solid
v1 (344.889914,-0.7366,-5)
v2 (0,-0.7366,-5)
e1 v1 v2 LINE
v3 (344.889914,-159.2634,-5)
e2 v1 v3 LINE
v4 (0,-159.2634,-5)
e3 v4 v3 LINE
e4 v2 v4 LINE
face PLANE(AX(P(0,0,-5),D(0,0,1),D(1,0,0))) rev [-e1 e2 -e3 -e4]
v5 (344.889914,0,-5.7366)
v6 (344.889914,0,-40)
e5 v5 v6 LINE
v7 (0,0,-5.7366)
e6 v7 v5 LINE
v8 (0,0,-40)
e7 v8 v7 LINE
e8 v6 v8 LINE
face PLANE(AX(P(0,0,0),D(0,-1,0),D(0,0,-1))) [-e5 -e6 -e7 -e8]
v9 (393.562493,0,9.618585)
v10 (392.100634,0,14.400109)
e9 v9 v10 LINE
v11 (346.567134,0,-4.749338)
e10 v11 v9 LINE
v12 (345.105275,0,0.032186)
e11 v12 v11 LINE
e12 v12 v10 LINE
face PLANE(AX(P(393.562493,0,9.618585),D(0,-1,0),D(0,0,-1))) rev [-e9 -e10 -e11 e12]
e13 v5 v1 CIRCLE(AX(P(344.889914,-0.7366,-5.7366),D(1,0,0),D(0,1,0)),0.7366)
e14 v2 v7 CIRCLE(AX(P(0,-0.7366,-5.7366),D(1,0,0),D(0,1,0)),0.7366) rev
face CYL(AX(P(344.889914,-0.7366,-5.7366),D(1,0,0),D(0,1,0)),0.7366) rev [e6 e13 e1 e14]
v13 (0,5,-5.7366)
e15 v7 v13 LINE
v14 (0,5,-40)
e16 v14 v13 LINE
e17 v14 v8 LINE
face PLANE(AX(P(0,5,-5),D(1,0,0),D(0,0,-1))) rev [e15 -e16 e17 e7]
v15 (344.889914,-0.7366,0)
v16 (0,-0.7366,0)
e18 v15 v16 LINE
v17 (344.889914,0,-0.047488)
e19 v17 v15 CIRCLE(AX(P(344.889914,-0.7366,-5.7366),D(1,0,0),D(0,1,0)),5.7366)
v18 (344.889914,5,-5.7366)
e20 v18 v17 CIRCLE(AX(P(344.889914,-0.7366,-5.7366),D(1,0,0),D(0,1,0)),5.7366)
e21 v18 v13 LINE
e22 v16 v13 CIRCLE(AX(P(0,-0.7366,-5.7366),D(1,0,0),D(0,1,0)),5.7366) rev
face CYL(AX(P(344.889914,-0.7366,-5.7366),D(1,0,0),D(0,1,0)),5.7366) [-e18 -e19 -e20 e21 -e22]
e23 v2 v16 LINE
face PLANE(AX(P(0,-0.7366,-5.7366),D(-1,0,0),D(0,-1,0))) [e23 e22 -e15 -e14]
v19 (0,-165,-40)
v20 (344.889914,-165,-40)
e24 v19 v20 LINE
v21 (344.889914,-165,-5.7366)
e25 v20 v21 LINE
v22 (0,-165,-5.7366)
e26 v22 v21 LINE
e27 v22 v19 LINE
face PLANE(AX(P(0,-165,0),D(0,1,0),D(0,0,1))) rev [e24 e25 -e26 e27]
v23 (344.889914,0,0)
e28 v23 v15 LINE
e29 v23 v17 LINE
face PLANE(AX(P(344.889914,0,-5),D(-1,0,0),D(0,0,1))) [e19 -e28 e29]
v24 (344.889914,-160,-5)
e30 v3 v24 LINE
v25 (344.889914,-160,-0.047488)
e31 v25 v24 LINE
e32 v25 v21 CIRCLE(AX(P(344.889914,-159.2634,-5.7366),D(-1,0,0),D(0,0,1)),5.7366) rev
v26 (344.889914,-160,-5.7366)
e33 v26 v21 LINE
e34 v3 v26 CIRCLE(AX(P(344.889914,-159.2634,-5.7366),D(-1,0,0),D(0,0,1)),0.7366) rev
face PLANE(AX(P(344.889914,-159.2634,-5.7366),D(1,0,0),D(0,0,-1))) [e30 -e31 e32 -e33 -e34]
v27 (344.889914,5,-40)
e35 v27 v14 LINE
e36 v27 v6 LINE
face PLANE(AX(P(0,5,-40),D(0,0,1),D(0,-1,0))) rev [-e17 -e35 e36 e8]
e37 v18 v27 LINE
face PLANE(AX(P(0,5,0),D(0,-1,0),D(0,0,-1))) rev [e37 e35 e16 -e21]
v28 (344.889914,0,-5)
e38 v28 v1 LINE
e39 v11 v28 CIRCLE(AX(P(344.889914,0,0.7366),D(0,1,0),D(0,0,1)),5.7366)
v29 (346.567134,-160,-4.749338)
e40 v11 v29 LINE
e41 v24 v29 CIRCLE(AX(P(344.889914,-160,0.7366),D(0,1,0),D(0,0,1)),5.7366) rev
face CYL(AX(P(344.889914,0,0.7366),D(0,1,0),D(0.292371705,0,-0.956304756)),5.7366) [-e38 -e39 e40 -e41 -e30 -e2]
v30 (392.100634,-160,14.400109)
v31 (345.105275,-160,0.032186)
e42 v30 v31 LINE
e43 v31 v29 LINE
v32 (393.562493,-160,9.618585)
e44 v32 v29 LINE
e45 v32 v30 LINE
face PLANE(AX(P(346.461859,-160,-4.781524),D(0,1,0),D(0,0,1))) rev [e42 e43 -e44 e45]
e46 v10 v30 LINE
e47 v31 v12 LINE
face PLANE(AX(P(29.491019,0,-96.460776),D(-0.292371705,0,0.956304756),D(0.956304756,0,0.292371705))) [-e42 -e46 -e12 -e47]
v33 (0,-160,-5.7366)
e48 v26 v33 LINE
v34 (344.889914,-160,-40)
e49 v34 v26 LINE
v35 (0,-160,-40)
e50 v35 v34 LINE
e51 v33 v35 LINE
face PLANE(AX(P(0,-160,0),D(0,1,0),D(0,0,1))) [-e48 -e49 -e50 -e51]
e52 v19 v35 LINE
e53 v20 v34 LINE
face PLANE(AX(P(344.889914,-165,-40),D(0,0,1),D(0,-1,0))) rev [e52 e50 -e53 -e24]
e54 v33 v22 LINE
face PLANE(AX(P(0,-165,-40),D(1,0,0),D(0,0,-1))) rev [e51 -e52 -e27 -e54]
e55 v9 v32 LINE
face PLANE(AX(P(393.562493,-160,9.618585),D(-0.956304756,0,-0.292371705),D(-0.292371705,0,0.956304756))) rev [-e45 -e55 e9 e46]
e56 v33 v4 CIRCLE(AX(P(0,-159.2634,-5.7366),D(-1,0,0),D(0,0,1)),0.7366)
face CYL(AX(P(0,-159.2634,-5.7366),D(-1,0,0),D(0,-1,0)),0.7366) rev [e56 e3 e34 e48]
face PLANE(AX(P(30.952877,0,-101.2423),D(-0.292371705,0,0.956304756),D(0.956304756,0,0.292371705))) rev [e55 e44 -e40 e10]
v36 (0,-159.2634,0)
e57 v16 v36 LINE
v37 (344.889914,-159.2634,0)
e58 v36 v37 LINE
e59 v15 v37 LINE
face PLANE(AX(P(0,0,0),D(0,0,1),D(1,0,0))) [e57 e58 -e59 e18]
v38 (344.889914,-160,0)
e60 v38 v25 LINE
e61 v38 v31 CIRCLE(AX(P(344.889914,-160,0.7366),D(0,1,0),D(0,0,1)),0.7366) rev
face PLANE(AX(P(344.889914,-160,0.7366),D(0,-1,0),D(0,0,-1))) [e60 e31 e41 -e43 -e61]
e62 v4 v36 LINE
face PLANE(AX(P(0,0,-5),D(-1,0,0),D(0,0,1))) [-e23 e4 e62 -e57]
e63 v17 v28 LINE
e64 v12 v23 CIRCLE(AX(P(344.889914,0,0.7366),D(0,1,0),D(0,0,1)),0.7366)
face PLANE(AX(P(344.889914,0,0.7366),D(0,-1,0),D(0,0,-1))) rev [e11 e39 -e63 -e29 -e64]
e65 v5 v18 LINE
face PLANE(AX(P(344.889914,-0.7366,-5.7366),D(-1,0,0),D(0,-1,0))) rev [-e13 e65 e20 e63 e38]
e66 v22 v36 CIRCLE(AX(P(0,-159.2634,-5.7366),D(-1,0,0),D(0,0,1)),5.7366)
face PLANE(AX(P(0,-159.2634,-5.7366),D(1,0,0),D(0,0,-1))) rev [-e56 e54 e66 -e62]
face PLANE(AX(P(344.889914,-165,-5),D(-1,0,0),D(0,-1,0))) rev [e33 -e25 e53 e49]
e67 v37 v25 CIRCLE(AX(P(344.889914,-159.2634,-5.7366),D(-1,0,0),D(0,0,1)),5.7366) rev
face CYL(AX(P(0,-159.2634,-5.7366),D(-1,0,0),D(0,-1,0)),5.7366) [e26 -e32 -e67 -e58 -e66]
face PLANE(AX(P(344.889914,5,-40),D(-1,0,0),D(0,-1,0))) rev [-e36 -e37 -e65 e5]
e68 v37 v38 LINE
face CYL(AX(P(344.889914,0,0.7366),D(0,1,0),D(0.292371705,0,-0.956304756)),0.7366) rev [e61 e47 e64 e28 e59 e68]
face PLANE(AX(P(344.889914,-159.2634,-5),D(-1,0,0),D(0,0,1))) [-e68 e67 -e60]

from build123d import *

# Parameters (mm, degrees)
SKETCH1_W                      = 345
SKETCH1_H                      = 160
BASE_FLANGE1_DEPTH             = 5
EDGE_FLANGE1_STRIP_CUT_DEPTH   = 160
EDGE_FLANGE1_DEPTH             = 160
EDGE_FLANGE2_STRIP_W           = 21.4732
EDGE_FLANGE2_STRIP_H           = 5
EDGE_FLANGE2_STRIP_CUT_DEPTH   = 344.889914392
EDGE_FLANGE2_STRIP_2_W         = 21.4732
EDGE_FLANGE2_STRIP_2_H         = 5
EDGE_FLANGE2_STRIP_CUT_2_DEPTH = 344.889914392
EDGE_FLANGE2_DEPTH             = 344.889914392
EDGE_FLANGE2_BEND_DEPTH        = 344.889914392


# Sheet-metal steps are written as plain solids
with BuildPart() as part:
    # Sketch1 → Base-Flange1 (new body)
    with BuildSketch(Plane.XY):
        with Locations((172.5, -80)):
            Rectangle(SKETCH1_W, SKETCH1_H)
    extrude(amount=-BASE_FLANGE1_DEPTH)

    # Edge-Flange1 strip (across the edge) → Edge-Flange1 strip cut (cut)
    with BuildSketch(Plane(origin=(345, -160, 0), x_dir=(-0.29237170472273066, 0, 0.9563047559630373), z_dir=(0, 1, 0))):
        Polygon((-11.027493953, 18.967789372), (-4.749337863, -1.567133914), (0.032185917, -0.10527539), (-6.245970173, 20.429647896), align=None)
    extrude(amount=EDGE_FLANGE1_STRIP_CUT_DEPTH, mode=Mode.SUBTRACT)

    # Edge-Flange1 section (across the edge) → Edge-Flange1 (add)
    with BuildSketch(Plane(origin=(345, -160, 0), x_dir=(-0.29237170472273066, 0, 0.9563047559630373), z_dir=(0, 1, 0))):
        with BuildLine():
            Line((-5, 0.110085608), (-5, 49.252744993))
            Line((-5, 49.252744993), (0, 49.252744993))
            Line((0, 49.252744993), (0, 0.110085608))
            ThreePointArc((0, 0.110085608), (0.008090915, 0.001209195), (0.032185917, -0.10527539))
            Line((0.032185917, -0.10527539), (-4.749337863, -1.567133914))
            ThreePointArc((-4.749337863, -1.567133914), (-4.936988402, -0.73783786), (-5, 0.110085608))
        make_face()
    extrude(amount=EDGE_FLANGE1_DEPTH)

    # Edge-Flange2 strip (across the edge) → Edge-Flange2 strip cut (cut)
    with BuildSketch(Plane(origin=(344.889914392, -160, -5), x_dir=(0, 1, 0), z_dir=(-1, 0, 0))):
        with Locations((-10, -2.5)):
            Rectangle(EDGE_FLANGE2_STRIP_W, EDGE_FLANGE2_STRIP_H)
    extrude(amount=EDGE_FLANGE2_STRIP_CUT_DEPTH, mode=Mode.SUBTRACT)

    # Edge-Flange2 strip 2 (across the edge) → Edge-Flange2 strip cut 2 (cut)
    with BuildSketch(Plane(origin=(0, 0, -5), x_dir=(0, -1, 0), z_dir=(1, 0, 0))):
        with Locations((-10, -2.5)):
            Rectangle(EDGE_FLANGE2_STRIP_2_W, EDGE_FLANGE2_STRIP_2_H)
    extrude(amount=EDGE_FLANGE2_STRIP_CUT_2_DEPTH, mode=Mode.SUBTRACT)

    # Edge-Flange2 section (across the edge) → Edge-Flange2 (add)
    with BuildSketch(Plane(origin=(344.889914392, -160, -5), x_dir=(0, 1, 0), z_dir=(-1, 0, 0))):
        with BuildLine():
            Line((-5, 0.7366), (-5, 35))
            Line((-5, 35), (0, 35))
            Line((0, 35), (0, 0.7366))
            ThreePointArc((0, 0.7366), (0.215745145, 0.215745145), (0.7366, 0))
            Line((0.7366, 0), (0.7366, -5))
            ThreePointArc((0.7366, -5), (-3.319788761, -3.319788761), (-5, 0.7366))
        make_face()
    extrude(amount=EDGE_FLANGE2_DEPTH)

    # Edge-Flange2 section 2 (across the edge) → Edge-Flange2 bend (add)
    with BuildSketch(Plane(origin=(0, 0, -5), x_dir=(0, -1, 0), z_dir=(1, 0, 0))):
        with BuildLine():
            Line((-5, 0.7366), (-5, 35))
            Line((-5, 35), (0, 35))
            Line((0, 35), (0, 0.7366))
            ThreePointArc((0, 0.7366), (0.215745145, 0.215745145), (0.7366, 0))
            Line((0.7366, 0), (0.7366, -5))
            ThreePointArc((0.7366, -5), (-3.319788761, -3.319788761), (-5, 0.7366))
        make_face()
    extrude(amount=EDGE_FLANGE2_BEND_DEPTH)


solid = part.part
